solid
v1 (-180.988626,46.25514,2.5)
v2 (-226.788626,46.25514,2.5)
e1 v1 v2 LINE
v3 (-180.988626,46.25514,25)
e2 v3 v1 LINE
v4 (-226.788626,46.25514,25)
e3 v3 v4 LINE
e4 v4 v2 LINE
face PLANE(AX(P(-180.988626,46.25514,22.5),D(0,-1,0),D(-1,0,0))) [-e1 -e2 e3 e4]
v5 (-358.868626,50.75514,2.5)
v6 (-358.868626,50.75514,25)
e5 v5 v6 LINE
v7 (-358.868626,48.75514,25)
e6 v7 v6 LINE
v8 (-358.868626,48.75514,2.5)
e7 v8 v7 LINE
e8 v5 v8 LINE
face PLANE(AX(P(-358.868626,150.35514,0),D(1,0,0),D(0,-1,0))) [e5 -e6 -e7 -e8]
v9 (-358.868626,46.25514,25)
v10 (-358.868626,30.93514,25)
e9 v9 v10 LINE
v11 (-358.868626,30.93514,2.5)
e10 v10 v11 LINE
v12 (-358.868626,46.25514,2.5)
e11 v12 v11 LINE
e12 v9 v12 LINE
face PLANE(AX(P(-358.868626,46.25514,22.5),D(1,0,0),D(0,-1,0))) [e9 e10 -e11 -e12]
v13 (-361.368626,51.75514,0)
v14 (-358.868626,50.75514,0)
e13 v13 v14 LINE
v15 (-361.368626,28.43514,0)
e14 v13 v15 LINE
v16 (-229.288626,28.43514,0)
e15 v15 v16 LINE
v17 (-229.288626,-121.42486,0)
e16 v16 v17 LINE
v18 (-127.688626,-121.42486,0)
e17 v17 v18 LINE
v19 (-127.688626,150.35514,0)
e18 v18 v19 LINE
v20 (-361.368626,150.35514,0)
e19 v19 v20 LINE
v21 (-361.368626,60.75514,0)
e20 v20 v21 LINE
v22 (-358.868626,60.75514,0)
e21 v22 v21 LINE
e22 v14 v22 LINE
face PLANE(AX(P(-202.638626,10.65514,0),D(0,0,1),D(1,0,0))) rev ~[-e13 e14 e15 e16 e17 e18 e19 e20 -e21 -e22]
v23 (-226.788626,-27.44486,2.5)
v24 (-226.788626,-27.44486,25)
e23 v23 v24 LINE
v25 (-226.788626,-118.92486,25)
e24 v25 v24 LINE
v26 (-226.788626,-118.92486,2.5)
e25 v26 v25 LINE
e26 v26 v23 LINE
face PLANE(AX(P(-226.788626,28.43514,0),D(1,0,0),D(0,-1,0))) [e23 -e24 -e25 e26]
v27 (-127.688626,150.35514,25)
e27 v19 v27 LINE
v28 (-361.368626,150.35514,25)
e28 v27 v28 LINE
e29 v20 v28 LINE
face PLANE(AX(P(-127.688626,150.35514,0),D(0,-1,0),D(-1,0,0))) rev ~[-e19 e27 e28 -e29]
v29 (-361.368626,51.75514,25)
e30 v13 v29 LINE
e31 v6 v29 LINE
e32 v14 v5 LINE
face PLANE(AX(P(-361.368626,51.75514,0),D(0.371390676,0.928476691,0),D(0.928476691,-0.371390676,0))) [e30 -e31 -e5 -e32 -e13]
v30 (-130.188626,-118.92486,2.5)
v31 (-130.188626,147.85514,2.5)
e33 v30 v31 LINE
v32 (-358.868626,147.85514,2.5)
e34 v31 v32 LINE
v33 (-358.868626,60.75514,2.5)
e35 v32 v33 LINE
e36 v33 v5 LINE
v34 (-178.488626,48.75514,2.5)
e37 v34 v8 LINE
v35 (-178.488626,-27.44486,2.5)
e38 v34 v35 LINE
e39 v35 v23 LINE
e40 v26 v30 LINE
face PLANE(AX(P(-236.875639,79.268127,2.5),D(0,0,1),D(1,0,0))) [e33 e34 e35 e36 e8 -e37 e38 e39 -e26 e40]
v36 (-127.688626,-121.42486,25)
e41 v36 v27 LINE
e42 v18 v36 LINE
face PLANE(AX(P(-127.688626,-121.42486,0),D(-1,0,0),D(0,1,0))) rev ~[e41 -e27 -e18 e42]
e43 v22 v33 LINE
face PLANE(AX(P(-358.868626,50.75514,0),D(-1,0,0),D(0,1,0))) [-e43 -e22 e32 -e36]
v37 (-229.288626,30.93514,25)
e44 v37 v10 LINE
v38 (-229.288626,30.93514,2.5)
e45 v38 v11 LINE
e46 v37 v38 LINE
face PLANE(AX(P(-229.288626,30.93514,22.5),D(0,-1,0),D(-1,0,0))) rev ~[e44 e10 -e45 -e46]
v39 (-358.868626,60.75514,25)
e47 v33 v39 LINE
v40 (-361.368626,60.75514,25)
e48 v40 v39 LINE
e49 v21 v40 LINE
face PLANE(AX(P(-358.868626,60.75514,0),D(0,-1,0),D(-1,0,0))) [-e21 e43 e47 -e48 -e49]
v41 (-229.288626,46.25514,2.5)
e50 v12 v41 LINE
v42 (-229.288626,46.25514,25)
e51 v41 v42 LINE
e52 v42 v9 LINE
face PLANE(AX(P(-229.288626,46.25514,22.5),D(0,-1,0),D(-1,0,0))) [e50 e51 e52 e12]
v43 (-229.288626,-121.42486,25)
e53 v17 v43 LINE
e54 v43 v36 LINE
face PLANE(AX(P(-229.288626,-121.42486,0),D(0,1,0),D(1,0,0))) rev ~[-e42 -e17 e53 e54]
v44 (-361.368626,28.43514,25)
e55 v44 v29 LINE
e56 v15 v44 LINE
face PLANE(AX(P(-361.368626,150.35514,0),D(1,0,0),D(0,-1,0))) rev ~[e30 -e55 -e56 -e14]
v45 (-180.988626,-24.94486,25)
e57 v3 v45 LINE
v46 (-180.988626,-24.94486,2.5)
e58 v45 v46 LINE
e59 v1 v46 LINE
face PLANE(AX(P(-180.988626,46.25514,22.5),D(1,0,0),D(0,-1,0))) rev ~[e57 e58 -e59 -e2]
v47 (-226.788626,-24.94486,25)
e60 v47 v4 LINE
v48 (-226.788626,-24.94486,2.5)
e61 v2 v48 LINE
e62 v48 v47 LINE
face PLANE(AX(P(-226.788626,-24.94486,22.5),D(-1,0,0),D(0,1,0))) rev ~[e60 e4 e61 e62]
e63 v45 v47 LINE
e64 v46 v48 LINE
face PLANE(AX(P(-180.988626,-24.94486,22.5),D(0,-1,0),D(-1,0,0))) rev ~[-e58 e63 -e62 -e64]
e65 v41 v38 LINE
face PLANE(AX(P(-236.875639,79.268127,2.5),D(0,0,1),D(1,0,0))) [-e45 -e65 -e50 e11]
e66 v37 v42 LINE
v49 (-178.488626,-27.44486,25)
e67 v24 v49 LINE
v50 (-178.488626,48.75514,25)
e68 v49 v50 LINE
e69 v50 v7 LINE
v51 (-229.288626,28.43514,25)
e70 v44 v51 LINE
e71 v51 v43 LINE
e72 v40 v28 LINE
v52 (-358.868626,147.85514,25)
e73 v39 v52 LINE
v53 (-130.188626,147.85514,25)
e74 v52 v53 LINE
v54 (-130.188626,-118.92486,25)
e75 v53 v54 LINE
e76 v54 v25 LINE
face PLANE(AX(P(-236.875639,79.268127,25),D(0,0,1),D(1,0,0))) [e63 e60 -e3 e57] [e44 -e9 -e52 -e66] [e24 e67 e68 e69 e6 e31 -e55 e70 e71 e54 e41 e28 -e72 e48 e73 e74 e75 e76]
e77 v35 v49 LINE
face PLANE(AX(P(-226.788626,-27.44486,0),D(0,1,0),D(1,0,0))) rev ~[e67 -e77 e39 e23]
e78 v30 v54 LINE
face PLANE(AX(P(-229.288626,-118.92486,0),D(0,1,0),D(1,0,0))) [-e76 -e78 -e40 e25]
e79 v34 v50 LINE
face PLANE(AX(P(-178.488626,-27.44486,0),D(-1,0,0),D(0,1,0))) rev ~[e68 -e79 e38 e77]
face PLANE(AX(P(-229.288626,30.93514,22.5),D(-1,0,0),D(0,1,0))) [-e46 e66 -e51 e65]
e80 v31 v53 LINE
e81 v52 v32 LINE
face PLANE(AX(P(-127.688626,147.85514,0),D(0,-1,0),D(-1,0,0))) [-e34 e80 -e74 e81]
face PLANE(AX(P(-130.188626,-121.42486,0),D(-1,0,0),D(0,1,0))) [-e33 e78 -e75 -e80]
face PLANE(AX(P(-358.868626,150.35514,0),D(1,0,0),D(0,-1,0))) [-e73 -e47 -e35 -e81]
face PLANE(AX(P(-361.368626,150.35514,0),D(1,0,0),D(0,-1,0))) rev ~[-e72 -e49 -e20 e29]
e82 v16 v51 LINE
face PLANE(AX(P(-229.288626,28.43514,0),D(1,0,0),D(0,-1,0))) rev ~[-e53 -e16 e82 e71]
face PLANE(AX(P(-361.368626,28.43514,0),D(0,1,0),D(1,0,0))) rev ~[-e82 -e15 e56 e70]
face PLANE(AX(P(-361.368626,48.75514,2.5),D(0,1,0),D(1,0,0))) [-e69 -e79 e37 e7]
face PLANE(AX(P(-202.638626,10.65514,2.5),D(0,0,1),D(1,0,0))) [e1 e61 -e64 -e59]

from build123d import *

# Parameters (mm, degrees)
F0_W      = 76.2
F0_H      = 20.32
F0_W_2    = 55.88
F1_DEPTH  = 25
F2_T      = -2.5
F3_W      = 134.58
F3_H      = 20.32
F4_DEPTH  = 22.5
F5_T      = -2.5
F6_W      = 48.3
F6_H      = 76.2
F7_DEPTH  = 25
F8_T      = -2.5
F10_DEPTH = 30


# Not quite as in the source:
# - a shell that OpenCascade refuses in one call is made with other operations: the cavity is built on its own and cut out


with BuildPart() as f1:
    # F0 (on Top) → F1 (new body)
    with BuildSketch(Plane.XY):
        Polygon((-361.3686263561, 74.1551402664), (-361.3686263561, 48.7551402664), (-285.1686263561, 48.7551402664), (-229.2886263561, 48.7551402664), (-178.4886263561, 48.7551402664), (-178.4886263561, -27.4448597336), (-148.0086263561, -27.4448597336), (-148.0086263561, 150.3551402664), (-236.9086263561, 150.3551402664), (-272.4686263561, 150.3551402664), (-361.3686263561, 150.3551402664), align=None)
        with Locations((-323.2686263561, 38.5951402664)):
            Rectangle(F0_W, F0_H)
        with Locations((-257.2286263561, 38.5951402664)):
            Rectangle(F0_W_2, F0_H)
        Polygon((-178.4886263561, 48.7551402664), (-229.2886263561, 48.7551402664), (-229.2886263561, 28.4351402664), (-229.2886263561, -27.4448597336), (-178.4886263561, -27.4448597336), align=None)
        Polygon((-178.4886263561, -27.4448597336), (-229.2886263561, -27.4448597336), (-229.2886263561, -121.4248597336), (-127.6886263561, -121.4248597336), (-127.6886263561, 150.3551402664), (-148.0086263561, 150.3551402664), (-148.0086263561, -27.4448597336), align=None)
    extrude(amount=F1_DEPTH)

    # F2
    f2_openings = [f1.faces().sort_by_distance(p)[0] for p in [
        (-221.527682, 42.066274, 25),
    ]]
    offset(amount=F2_T, openings=f2_openings, kind=Kind.INTERSECTION)

    # F3 (on face) → F4 (join)
    with BuildSketch(Plane.XY.offset(2.5)):
        with Locations((-294.0786263561, 38.5951402664)):
            Rectangle(F3_W, F3_H)
    extrude(amount=F4_DEPTH)

    # F5: a shell. OpenCascade refuses it in one call, so the cavity is built on its own and cut out:
    # the body offset inwards by the wall thickness, plus a prism from it out through each open face.
    f5_core = offset(f1.part, amount=F5_T, kind=Kind.INTERSECTION, mode=Mode.PRIVATE)
    f5_exits = [f5_core.faces().sort_by_distance(p)[0] for p in [
        (-294.078626, 38.59514, 22.5),
    ]]
    add(f5_core, mode=Mode.SUBTRACT)
    extrude(f5_exits, amount=-F5_T, mode=Mode.SUBTRACT)

    # F6 (on Top) → F7 (join)
    with BuildSketch(Plane.XY):
        with Locations((-202.6386263561, 10.6551402664)):
            Rectangle(F6_W, F6_H)
    extrude(amount=F7_DEPTH)

    # F8: a shell. OpenCascade refuses it in one call, so the cavity is built on its own and cut out:
    # the body offset inwards by the wall thickness, plus a prism from it out through each open face.
    f8_core = offset(f1.part, amount=F8_T, kind=Kind.INTERSECTION, mode=Mode.PRIVATE)
    f8_exits = [f8_core.faces().sort_by_distance(p)[0] for p in [
        (-203.888626, 10.65514, 22.5),
    ]]
    add(f8_core, mode=Mode.SUBTRACT)
    extrude(f8_exits, amount=-F8_T, mode=Mode.SUBTRACT)

    # F9 (on Top) → F10 (cut)
    with BuildSketch(Plane.XY):
        Polygon((-358.8686263561, 60.7551402664), (-361.3686263561, 60.7551402664), (-361.3686263561, 51.7551402664), (-358.8686263561, 50.7551402664), align=None)
    extrude(amount=F10_DEPTH, mode=Mode.SUBTRACT)


solid = f1.part
